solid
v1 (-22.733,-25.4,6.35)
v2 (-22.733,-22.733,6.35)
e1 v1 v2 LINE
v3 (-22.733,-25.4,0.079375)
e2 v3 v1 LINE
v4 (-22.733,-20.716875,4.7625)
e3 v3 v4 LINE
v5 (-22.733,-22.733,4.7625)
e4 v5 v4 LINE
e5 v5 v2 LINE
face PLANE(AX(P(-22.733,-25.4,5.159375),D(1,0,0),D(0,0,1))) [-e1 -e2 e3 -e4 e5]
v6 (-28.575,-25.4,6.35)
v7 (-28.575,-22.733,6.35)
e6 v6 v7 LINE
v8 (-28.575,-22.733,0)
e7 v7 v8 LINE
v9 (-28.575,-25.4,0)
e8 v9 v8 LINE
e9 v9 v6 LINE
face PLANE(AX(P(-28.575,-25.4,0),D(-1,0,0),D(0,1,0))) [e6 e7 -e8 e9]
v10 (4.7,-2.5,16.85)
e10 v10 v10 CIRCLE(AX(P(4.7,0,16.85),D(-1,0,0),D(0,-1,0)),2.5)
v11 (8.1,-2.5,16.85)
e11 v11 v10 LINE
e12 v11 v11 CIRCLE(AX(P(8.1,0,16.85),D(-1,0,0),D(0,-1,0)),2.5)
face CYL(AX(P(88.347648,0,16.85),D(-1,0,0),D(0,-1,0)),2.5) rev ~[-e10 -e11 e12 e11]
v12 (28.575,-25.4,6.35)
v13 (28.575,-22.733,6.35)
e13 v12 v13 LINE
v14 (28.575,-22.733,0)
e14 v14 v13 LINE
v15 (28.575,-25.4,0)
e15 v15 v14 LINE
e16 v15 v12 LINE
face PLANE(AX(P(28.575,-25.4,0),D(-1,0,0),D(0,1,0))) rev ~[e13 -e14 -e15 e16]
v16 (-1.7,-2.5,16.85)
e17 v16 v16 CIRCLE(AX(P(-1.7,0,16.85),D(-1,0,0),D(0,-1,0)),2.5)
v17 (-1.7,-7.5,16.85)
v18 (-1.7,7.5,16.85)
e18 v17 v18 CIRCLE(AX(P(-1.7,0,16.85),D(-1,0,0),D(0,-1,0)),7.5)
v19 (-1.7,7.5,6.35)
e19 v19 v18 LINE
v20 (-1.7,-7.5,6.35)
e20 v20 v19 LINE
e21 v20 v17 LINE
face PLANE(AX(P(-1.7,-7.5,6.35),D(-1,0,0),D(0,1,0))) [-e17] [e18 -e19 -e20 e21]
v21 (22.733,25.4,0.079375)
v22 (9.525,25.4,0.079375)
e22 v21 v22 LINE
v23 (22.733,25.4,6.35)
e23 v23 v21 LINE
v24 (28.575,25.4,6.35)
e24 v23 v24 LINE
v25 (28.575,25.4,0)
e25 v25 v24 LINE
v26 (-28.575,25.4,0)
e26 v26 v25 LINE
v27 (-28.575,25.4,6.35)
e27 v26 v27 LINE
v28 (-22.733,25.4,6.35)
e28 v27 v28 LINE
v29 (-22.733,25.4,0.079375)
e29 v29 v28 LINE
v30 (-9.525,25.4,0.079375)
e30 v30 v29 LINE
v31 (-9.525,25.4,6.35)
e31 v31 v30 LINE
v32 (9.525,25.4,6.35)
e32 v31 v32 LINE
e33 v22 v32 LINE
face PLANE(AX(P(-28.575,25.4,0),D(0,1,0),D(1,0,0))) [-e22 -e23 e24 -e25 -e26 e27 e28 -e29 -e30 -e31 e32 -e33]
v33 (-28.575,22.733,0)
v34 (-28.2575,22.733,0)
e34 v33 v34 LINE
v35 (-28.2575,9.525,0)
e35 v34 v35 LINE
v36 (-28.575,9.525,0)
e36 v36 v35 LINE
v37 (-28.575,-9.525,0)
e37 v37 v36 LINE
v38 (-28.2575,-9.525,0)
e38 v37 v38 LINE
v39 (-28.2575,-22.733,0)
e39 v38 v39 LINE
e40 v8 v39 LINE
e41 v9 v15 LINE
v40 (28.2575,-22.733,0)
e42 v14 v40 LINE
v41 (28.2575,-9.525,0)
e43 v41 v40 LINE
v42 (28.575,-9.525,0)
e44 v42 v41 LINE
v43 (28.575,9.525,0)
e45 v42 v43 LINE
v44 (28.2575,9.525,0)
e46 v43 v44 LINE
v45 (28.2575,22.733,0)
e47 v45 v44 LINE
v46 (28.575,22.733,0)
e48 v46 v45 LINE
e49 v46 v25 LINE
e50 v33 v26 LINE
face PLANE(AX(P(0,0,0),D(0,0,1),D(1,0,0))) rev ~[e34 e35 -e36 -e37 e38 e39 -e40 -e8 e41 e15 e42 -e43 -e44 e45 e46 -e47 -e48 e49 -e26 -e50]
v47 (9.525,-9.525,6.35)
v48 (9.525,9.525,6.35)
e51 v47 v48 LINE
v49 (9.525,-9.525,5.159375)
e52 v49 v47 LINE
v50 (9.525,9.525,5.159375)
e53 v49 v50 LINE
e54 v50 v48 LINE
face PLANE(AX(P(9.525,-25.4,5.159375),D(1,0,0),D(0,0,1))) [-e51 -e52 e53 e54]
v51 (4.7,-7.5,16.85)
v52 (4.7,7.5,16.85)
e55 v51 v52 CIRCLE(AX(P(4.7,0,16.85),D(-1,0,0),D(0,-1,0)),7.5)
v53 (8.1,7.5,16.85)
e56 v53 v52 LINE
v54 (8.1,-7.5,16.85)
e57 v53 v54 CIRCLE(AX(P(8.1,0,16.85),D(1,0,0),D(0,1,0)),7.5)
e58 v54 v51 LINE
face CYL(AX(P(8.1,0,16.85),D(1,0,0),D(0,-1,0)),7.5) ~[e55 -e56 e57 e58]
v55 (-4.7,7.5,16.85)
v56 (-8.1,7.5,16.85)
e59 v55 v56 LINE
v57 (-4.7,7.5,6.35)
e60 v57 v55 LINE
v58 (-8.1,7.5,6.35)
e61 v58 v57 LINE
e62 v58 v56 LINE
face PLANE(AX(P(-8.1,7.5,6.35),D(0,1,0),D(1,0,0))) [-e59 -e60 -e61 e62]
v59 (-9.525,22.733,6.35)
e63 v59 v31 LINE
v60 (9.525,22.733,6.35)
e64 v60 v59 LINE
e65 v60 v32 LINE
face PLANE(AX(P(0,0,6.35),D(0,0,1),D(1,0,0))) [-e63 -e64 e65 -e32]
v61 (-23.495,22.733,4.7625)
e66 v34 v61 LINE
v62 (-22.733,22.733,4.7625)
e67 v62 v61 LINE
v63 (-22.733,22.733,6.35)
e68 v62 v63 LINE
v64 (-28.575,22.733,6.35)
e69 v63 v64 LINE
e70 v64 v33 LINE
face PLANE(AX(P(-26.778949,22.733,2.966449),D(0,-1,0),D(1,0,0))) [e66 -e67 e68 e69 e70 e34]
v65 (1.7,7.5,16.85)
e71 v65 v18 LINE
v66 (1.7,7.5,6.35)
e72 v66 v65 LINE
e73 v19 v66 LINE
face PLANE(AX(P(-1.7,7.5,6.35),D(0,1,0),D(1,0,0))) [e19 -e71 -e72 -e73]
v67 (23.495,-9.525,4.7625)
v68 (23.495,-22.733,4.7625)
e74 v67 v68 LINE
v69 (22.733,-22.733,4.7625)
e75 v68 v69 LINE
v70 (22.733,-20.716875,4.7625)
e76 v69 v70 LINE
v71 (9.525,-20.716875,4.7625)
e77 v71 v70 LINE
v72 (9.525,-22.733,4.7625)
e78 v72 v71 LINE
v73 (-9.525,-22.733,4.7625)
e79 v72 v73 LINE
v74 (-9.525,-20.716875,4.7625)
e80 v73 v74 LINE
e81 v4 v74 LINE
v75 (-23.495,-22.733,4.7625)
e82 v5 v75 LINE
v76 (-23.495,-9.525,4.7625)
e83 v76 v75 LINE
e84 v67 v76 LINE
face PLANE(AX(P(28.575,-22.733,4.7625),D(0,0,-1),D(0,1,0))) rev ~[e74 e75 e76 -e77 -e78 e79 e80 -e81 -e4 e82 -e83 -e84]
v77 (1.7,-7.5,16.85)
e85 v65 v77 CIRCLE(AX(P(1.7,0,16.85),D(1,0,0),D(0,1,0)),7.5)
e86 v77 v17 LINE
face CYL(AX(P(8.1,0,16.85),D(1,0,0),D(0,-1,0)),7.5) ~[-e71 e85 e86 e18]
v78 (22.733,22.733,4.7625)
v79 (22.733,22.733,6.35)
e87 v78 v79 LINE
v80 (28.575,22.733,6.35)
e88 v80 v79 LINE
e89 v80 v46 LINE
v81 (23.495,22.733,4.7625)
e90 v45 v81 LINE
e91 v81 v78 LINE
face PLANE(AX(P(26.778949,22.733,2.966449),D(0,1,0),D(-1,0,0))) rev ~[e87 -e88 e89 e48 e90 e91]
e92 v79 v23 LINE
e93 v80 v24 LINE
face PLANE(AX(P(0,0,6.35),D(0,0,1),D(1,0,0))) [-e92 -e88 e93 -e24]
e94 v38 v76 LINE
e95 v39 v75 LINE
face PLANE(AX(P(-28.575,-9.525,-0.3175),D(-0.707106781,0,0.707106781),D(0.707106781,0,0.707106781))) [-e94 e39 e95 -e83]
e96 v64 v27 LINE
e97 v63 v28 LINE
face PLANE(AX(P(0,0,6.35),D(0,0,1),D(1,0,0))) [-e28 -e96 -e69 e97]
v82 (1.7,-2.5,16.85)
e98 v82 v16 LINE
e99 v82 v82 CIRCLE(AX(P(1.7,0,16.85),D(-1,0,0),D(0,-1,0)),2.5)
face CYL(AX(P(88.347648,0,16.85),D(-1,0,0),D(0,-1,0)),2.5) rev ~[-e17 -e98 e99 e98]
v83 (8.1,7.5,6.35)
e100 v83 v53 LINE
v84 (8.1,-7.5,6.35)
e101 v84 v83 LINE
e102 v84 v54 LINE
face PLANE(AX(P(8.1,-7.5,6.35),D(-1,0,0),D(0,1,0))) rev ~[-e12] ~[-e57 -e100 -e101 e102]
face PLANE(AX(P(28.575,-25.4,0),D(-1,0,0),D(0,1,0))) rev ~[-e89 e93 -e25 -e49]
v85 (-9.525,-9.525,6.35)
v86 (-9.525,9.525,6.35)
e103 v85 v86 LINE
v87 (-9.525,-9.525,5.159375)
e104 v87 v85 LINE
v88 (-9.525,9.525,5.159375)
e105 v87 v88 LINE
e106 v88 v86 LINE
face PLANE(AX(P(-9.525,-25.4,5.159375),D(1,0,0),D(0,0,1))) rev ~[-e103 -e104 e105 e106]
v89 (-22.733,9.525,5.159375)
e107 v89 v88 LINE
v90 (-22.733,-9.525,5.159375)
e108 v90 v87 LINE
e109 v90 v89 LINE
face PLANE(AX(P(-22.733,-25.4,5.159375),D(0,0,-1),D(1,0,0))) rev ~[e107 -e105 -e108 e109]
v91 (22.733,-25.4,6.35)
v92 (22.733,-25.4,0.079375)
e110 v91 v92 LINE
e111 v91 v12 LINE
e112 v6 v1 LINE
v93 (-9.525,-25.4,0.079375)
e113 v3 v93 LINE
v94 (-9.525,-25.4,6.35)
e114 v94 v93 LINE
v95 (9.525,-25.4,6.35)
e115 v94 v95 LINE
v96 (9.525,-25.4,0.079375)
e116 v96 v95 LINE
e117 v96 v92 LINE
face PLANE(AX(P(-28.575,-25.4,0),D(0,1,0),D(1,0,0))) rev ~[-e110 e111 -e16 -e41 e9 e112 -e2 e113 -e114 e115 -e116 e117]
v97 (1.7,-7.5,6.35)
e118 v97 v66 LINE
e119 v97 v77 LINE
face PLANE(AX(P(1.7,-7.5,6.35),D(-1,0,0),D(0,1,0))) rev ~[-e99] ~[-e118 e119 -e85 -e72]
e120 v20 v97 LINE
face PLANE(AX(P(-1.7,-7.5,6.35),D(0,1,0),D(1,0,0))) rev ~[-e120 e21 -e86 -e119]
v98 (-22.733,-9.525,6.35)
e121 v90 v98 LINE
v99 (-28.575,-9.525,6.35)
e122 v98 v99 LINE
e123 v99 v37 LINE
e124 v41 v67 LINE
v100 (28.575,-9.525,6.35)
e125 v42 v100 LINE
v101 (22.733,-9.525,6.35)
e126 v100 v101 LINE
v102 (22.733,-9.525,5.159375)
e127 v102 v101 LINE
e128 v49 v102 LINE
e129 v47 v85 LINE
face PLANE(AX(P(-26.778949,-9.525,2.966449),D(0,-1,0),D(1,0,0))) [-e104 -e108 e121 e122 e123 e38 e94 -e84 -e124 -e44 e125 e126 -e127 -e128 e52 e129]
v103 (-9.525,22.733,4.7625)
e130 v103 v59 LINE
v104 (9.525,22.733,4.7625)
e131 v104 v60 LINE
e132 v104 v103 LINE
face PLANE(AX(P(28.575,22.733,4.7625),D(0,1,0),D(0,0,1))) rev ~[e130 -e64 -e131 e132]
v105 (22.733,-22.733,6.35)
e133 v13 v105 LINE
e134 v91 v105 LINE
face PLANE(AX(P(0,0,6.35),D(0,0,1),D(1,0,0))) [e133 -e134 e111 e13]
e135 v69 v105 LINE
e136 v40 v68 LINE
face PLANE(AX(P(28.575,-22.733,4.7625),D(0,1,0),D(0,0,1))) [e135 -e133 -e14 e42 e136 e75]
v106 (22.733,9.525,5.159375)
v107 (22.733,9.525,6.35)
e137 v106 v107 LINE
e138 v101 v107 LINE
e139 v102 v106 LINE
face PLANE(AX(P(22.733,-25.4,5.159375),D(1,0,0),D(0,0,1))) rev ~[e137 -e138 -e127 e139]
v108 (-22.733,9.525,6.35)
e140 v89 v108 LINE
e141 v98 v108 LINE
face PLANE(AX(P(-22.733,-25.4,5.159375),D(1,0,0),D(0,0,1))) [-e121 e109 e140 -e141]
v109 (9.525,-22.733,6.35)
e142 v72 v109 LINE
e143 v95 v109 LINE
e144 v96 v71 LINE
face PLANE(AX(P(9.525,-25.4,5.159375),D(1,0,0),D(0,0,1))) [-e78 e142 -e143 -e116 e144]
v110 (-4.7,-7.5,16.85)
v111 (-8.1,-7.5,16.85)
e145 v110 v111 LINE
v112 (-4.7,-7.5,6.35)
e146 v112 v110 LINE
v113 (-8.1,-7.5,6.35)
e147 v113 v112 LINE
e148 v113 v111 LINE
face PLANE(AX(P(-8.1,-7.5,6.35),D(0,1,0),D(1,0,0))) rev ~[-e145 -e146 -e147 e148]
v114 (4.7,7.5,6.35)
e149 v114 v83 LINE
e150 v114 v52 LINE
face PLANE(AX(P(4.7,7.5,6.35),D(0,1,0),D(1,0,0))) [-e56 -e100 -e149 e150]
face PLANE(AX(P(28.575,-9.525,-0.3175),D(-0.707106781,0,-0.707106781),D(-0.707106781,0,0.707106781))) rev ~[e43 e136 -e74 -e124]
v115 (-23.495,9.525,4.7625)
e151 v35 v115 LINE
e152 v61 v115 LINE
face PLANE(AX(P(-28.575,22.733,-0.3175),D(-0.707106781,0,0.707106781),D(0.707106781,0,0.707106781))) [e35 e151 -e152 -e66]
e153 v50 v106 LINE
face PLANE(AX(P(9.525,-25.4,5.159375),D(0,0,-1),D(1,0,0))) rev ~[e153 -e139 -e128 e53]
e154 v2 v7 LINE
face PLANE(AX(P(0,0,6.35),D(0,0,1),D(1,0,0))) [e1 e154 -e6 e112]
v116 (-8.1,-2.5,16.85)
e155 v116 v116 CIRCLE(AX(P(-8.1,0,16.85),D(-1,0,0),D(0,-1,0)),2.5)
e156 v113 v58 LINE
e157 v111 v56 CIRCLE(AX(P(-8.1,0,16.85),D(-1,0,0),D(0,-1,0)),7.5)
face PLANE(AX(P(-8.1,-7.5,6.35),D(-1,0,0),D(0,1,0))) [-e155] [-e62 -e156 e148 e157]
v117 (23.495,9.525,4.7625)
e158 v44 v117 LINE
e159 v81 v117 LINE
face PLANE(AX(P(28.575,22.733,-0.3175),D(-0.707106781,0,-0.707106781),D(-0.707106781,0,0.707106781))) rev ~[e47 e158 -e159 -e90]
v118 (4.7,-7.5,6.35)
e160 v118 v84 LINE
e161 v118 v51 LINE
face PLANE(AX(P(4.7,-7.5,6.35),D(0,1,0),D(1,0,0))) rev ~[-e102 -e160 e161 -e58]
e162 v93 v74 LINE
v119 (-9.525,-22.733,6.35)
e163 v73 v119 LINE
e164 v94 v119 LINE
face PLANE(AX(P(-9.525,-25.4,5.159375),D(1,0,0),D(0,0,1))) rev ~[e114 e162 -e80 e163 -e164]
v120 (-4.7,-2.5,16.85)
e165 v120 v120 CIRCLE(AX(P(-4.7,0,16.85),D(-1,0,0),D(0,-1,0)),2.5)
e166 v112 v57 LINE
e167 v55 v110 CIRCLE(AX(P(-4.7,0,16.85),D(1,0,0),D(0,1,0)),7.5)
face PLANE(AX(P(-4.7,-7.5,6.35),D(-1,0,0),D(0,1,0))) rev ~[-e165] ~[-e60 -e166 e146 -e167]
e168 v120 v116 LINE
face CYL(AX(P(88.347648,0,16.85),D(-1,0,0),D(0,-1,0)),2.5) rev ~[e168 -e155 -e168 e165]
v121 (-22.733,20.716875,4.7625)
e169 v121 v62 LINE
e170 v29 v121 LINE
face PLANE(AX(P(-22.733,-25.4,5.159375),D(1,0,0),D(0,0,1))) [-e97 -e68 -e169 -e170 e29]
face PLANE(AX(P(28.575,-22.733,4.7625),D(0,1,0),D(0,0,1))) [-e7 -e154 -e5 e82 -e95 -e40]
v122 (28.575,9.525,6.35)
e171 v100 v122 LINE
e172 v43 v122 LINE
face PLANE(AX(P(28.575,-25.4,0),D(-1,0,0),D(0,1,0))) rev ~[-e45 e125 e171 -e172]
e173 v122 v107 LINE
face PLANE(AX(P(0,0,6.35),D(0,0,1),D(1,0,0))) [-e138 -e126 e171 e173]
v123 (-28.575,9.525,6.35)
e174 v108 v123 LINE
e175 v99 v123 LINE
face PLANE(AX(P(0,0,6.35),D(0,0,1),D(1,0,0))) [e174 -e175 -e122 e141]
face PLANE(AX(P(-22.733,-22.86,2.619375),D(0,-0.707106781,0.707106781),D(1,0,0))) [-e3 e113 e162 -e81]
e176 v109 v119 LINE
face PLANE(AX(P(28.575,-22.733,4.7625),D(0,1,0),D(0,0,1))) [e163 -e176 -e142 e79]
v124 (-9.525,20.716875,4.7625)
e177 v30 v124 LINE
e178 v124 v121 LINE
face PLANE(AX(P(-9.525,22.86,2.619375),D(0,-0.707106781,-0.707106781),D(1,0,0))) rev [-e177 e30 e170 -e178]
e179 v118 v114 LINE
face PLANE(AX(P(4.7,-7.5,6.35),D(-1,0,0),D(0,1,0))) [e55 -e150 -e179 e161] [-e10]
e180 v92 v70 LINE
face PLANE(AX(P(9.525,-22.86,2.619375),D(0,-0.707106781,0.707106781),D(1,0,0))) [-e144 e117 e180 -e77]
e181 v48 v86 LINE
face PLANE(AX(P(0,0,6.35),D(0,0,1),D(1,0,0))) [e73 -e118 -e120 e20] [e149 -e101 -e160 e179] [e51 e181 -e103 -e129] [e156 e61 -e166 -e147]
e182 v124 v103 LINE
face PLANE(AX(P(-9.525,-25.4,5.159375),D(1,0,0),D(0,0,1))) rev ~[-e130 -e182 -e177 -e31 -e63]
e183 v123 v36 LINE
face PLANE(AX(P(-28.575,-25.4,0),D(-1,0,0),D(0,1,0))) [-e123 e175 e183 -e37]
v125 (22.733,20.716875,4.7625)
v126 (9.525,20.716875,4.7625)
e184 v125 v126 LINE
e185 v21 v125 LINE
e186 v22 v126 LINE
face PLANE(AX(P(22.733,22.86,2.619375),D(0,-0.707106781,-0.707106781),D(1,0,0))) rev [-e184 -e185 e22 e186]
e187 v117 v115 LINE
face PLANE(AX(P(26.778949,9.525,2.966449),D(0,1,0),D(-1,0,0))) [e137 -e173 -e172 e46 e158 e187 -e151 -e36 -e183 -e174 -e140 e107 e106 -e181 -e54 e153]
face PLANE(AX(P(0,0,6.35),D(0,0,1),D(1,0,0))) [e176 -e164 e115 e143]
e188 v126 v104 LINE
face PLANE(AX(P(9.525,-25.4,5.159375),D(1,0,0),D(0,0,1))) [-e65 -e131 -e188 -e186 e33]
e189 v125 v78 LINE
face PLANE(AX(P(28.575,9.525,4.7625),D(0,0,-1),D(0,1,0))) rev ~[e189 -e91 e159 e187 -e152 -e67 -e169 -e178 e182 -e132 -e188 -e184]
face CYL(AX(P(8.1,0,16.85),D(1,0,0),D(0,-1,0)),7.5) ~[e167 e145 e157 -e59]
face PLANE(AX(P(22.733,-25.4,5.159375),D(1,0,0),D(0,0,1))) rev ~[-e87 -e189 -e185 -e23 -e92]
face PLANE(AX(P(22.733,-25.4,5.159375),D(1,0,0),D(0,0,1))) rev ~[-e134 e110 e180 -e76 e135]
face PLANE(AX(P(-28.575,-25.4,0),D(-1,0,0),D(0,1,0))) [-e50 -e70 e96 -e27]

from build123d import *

# Parameters (mm, degrees)
F0_W        = 57.15
F0_H        = 50.8
F1_DEPTH    = 6.35
F2_W        = 13.208
F2_H        = 1.190625
F3_DEPTH    = 50.801
F4_SIZE     = 5.08
F5_W        = 3.4
F5_H        = 15
F6_DEPTH    = 18
F7_W        = 13.208
F7_H        = 1.5875
F8_DEPTH    = 57.151
F9_T1_DEPTH = 13.208
F9_T3_DEPTH = 13.208
F11_D       = 5
F12_DEPTH   = 36.676


# Not quite as in the source:
# - a fillet or chamfer that OpenCascade refuses, or shapes differently, is made with other operations: its cross-section is extruded or revolved along the edge and cut away or added


with BuildPart() as f1:
    # F0 (on Top) → F1 (new body)
    with BuildSketch(Plane.XY):
        Rectangle(F0_W, F0_H)
    extrude(amount=F1_DEPTH)

    # F2 (on face) → F3 (cut, through all)
    with BuildSketch(Plane.XZ.offset(25.4)):
        with Locations((-16.129, 5.7546875)):
            Rectangle(F2_W, F2_H)
        with Locations((16.129, 5.7546875)):
            Rectangle(F2_W, F2_H)
    extrude(amount=-F3_DEPTH, mode=Mode.SUBTRACT)

    # F4
    f4_edges = [f1.edges().sort_by_distance(p)[0] for p in [
        (-16.129, -25.4, 5.159375),
        (16.129, -25.4, 5.159375),
        (-16.129, 25.4, 5.159375),
        (16.129, 25.4, 5.159375),
    ]]
    chamfer(f4_edges, length=F4_SIZE)

    # F5 (on face) → F6 (join)
    with BuildSketch(Plane.XY.offset(6.35)):
        Rectangle(F5_W, F5_H)
        with Locations((6.4, 0)):
            Rectangle(F5_W, F5_H)
        with Locations((-6.4, 0)):
            Rectangle(F5_W, F5_H)
    extrude(amount=F6_DEPTH)

    # F7 (on face) → F8 (cut, through all)
    with BuildSketch(Plane.YZ.offset(28.575)):
        with Locations((-16.129, 5.55625)):
            Rectangle(F7_W, F7_H)
        with Locations((16.129, 5.55625)):
            Rectangle(F7_W, F7_H)
    extrude(amount=-F8_DEPTH, mode=Mode.SUBTRACT)

    # F9: chamfer of 5.08 on 4 edges, made by hand

    # F9_s2 → F9_t1 (cut)
    with BuildSketch(Plane.XZ.offset(-22.733)):
        Polygon((28.575, -0.3175), (23.495, 4.7625), (28.575, 4.7625), align=None)
        Polygon((-28.575, -0.3175), (-23.495, 4.7625), (-28.575, 4.7625), align=None)
    extrude(amount=F9_T1_DEPTH, mode=Mode.SUBTRACT)

    # F9_s4 → F9_t3 (cut)
    with BuildSketch(Plane.XZ.offset(9.525)):
        Polygon((28.575, -0.3175), (23.495, 4.7625), (28.575, 4.7625), align=None)
        Polygon((-28.575, -0.3175), (-23.495, 4.7625), (-28.575, 4.7625), align=None)
    extrude(amount=F9_T3_DEPTH, mode=Mode.SUBTRACT)

    # F11 (through all)
    with Locations(Plane.YZ.offset(8.1)):
        with Locations((0, 16.85)):
            Hole(F11_D / 2)

    # F10 (on face) → F12 (cut, through all)
    with BuildSketch(Plane.YZ.offset(8.1)):
        with BuildLine():
            Line((-7.5, 24.35), (-7.5, 16.85))
            ThreePointArc((-7.5, 16.85), (-5.3033008589, 22.1533008589), (0, 24.35))
            Line((0, 24.35), (-7.5, 24.35))
        make_face()
        with BuildLine():
            Line((7.5, 24.35), (0, 24.35))
            ThreePointArc((0, 24.35), (5.3033008589, 22.1533008589), (7.5, 16.85))
            Line((7.5, 16.85), (7.5, 24.35))
        make_face()
    extrude(amount=-F12_DEPTH, mode=Mode.SUBTRACT)


solid = f1.part
